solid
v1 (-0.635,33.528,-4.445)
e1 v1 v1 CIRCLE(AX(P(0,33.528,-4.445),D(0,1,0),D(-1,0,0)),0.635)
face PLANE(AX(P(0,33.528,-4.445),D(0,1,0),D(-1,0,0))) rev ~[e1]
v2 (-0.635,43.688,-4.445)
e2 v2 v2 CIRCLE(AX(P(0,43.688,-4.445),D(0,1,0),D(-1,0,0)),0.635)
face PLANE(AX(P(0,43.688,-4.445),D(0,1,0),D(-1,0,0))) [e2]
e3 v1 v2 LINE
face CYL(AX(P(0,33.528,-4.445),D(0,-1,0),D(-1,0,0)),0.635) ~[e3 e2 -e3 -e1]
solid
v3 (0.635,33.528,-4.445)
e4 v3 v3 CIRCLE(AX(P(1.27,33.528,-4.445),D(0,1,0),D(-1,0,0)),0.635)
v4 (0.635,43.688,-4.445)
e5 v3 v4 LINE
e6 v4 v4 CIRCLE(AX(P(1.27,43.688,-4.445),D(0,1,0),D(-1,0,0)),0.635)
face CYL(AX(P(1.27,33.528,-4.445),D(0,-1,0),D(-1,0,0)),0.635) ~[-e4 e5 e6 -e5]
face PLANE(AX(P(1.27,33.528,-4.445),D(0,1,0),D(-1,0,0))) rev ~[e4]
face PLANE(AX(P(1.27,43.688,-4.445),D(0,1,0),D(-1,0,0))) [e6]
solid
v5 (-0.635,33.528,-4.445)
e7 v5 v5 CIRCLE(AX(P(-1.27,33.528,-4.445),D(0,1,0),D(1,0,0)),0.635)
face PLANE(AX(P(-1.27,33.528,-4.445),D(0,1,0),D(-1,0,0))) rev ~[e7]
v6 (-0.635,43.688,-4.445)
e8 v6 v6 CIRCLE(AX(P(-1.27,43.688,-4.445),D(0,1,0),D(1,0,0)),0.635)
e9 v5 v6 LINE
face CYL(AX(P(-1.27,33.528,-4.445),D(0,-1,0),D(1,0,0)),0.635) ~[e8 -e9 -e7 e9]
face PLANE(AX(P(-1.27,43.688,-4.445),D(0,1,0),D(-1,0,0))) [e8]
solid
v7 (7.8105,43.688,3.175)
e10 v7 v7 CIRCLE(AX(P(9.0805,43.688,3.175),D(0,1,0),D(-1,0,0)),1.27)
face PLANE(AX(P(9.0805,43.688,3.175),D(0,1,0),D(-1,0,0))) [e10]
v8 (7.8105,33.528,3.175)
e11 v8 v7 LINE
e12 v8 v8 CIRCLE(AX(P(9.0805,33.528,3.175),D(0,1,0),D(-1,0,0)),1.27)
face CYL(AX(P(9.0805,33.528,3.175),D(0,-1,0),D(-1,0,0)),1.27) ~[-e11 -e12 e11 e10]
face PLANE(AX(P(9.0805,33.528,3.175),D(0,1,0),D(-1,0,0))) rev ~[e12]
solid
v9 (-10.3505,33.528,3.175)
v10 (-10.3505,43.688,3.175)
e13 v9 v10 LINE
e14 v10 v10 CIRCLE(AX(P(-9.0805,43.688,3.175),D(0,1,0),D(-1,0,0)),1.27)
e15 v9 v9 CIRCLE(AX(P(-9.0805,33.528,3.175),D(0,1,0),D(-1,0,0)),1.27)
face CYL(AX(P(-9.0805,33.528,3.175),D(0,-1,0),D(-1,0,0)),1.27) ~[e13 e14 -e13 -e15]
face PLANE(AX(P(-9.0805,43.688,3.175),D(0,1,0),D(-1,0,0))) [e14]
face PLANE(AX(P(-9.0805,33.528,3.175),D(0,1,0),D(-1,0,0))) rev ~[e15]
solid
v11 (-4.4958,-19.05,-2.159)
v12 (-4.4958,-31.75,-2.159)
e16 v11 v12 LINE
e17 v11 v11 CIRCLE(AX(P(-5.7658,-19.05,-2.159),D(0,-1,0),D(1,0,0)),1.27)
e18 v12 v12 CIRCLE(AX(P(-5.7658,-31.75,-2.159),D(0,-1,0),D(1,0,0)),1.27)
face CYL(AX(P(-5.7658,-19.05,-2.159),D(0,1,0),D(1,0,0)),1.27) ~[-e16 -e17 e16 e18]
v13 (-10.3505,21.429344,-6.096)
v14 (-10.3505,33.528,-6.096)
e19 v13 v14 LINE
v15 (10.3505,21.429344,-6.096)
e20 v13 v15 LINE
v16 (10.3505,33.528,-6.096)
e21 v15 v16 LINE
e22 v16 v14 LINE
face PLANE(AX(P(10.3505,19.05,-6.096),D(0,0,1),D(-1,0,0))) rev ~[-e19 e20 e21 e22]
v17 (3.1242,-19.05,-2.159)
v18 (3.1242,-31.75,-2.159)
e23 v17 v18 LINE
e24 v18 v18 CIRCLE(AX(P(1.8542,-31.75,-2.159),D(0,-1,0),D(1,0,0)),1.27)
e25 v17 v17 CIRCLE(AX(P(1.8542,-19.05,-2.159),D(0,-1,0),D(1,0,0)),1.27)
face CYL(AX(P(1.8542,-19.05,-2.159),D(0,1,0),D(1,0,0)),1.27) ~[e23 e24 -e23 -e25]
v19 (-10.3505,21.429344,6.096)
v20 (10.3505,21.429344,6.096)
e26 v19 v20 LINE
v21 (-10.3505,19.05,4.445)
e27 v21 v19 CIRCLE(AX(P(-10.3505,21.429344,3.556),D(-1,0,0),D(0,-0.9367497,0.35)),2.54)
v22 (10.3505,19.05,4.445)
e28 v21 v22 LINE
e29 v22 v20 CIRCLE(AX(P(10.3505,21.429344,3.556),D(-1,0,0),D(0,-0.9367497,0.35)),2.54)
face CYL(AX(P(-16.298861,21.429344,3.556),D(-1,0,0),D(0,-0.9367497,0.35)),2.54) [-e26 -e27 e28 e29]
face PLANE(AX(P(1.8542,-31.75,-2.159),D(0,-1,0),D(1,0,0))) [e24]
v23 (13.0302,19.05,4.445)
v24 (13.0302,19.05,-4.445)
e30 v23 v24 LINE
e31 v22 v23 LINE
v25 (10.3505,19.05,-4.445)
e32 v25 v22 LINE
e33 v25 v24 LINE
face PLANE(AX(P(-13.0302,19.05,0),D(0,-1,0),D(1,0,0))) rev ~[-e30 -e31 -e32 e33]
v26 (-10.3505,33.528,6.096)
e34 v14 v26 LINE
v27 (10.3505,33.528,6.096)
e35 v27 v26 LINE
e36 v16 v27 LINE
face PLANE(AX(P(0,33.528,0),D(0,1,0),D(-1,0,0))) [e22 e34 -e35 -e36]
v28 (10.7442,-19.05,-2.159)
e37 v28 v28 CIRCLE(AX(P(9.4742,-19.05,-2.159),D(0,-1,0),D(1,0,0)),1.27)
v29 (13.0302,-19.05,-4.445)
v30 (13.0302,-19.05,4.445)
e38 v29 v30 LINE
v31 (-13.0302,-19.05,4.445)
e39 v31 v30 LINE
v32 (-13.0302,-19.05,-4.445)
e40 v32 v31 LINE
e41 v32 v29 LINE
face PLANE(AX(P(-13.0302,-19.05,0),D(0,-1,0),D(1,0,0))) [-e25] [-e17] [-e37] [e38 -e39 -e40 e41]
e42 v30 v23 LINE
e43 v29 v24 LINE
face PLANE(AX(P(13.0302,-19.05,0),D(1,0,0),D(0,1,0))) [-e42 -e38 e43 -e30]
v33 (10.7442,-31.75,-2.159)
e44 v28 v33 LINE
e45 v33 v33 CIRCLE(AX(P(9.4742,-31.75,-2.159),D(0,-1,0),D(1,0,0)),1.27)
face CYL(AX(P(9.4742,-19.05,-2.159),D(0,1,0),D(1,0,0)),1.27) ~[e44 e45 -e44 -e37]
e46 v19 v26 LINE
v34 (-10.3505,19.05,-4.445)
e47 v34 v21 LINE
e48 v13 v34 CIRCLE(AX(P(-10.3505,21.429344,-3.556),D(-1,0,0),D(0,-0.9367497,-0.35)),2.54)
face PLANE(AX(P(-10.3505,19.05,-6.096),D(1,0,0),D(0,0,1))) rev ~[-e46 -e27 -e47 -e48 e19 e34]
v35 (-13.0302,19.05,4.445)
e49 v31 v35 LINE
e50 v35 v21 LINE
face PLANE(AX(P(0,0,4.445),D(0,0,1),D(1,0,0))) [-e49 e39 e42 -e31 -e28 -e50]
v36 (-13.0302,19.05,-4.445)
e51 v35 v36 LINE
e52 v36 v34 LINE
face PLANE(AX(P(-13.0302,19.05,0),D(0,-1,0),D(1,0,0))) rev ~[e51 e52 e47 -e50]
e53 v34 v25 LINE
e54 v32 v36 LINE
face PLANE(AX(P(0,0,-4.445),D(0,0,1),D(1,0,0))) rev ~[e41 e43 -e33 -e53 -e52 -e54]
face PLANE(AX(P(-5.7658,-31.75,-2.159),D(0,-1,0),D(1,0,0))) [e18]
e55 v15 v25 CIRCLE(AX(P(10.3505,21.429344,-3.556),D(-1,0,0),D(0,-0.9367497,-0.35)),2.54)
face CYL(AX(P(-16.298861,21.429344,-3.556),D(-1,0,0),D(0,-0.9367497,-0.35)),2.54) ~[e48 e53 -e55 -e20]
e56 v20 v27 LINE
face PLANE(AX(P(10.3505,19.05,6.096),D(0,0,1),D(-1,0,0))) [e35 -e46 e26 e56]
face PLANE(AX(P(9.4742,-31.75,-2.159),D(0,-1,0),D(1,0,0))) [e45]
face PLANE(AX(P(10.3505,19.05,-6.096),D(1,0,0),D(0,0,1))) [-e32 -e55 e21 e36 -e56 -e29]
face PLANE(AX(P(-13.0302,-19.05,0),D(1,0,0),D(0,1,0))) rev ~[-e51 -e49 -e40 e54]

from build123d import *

# Parameters (mm, degrees)
F0_W        = 26.0604
F0_H        = 38.1
F1_DEPTH    = 4.445
F2_R        = 1.27
F3_DEPTH    = 12.7
F4_W        = 20.701
F4_H        = 12.192
F5_DEPTH    = 14.478
F6_R        = 1.27
F7_DEPTH    = 10.16
F6_R_2      = 0.635
F8_T1_DEPTH = 32.5977211869


# Not quite as in the source:
# - a fillet or chamfer that OpenCascade refuses, or shapes differently, is made with other operations: its cross-section is extruded or revolved along the edge and cut away or added


with BuildPart() as f1:
    # F0 (on Top) → F1 (new body, symmetric)
    with BuildSketch(Plane.XY):
        Rectangle(F0_W, F0_H)
    extrude(amount=F1_DEPTH, both=True)

    # F2 (on face) → F3 (join)
    with BuildSketch(Plane.XZ.offset(19.05)):
        with Locations((-5.7658, -2.159)):
            Circle(F2_R)
        with Locations((1.8542, -2.159)):
            Circle(F2_R)
        with Locations((9.4742, -2.159)):
            Circle(F2_R)
    extrude(amount=F3_DEPTH)

    # F4 (on face) → F5 (join)
    with BuildSketch(Plane(origin=(0, 19.05, 0), x_dir=(-1, 0, 0), z_dir=(0, 1, 0))):
        Rectangle(F4_W, F4_H)
    extrude(amount=F5_DEPTH)

    # F8: fillet of radius 2.54 on 2 edges, made by hand

    # F8_s2 → F8_t1 (cut)
    with BuildSketch(Plane.YZ.offset(-16.2988605935)):
        with BuildLine():
            ThreePointArc((19.05, 4.445), (19.9813214475, 5.6428229441), (21.4293442374, 6.096))
            Line((21.4293442374, 6.096), (19.05, 6.096))
            Line((19.05, 6.096), (19.05, 4.445))
        make_face()
        with BuildLine():
            ThreePointArc((19.05, -4.445), (19.9813214475, -5.6428229441), (21.4293442374, -6.096))
            Line((21.4293442374, -6.096), (19.05, -6.096))
            Line((19.05, -6.096), (19.05, -4.445))
        make_face()
    extrude(amount=F8_T1_DEPTH, mode=Mode.SUBTRACT)


with BuildPart() as f7:
    # F6 (on face) → F7 (new body)
    with BuildSketch(Plane(origin=(0, 33.528, 0), x_dir=(-1, 0, 0), z_dir=(0, 1, 0))):
        with Locations((-9.0805, 3.175)):
            Circle(F6_R)
    extrude(amount=F7_DEPTH)


with BuildPart() as f7b:
    # F6 (on face) → F7, piece 2 (new body)
    with BuildSketch(Plane(origin=(0, 33.528, 0), x_dir=(-1, 0, 0), z_dir=(0, 1, 0))):
        with Locations((9.0805, 3.175)):
            Circle(F6_R)
    extrude(amount=F7_DEPTH)


with BuildPart() as f7c:
    # F6 (on face) → F7, piece 3 (new body)
    with BuildSketch(Plane(origin=(0, 33.528, 0), x_dir=(-1, 0, 0), z_dir=(0, 1, 0))):
        with BuildLine():
            ThreePointArc((-0.635, -4.445), (0, -5.08), (0.635, -4.445))
            ThreePointArc((0.635, -4.445), (0, -3.81), (-0.635, -4.445))
        make_face()
    extrude(amount=F7_DEPTH)


with BuildPart() as f7d:
    # F6 (on face) → F7, piece 4 (new body)
    with BuildSketch(Plane(origin=(0, 33.528, 0), x_dir=(-1, 0, 0), z_dir=(0, 1, 0))):
        with Locations((-1.27, -4.445)):
            Circle(F6_R_2)
    extrude(amount=F7_DEPTH)


with BuildPart() as f7e:
    # F6 (on face) → F7, piece 5 (new body)
    with BuildSketch(Plane(origin=(0, 33.528, 0), x_dir=(-1, 0, 0), z_dir=(0, 1, 0))):
        with BuildLine():
            ThreePointArc((1.905, -4.445), (1.27, -3.81), (0.635, -4.445))
            ThreePointArc((0.635, -4.445), (1.27, -5.08), (1.905, -4.445))
        make_face()
    extrude(amount=F7_DEPTH)


solid = Compound([f1.part, f7.part, f7b.part, f7c.part, f7d.part, f7e.part])
